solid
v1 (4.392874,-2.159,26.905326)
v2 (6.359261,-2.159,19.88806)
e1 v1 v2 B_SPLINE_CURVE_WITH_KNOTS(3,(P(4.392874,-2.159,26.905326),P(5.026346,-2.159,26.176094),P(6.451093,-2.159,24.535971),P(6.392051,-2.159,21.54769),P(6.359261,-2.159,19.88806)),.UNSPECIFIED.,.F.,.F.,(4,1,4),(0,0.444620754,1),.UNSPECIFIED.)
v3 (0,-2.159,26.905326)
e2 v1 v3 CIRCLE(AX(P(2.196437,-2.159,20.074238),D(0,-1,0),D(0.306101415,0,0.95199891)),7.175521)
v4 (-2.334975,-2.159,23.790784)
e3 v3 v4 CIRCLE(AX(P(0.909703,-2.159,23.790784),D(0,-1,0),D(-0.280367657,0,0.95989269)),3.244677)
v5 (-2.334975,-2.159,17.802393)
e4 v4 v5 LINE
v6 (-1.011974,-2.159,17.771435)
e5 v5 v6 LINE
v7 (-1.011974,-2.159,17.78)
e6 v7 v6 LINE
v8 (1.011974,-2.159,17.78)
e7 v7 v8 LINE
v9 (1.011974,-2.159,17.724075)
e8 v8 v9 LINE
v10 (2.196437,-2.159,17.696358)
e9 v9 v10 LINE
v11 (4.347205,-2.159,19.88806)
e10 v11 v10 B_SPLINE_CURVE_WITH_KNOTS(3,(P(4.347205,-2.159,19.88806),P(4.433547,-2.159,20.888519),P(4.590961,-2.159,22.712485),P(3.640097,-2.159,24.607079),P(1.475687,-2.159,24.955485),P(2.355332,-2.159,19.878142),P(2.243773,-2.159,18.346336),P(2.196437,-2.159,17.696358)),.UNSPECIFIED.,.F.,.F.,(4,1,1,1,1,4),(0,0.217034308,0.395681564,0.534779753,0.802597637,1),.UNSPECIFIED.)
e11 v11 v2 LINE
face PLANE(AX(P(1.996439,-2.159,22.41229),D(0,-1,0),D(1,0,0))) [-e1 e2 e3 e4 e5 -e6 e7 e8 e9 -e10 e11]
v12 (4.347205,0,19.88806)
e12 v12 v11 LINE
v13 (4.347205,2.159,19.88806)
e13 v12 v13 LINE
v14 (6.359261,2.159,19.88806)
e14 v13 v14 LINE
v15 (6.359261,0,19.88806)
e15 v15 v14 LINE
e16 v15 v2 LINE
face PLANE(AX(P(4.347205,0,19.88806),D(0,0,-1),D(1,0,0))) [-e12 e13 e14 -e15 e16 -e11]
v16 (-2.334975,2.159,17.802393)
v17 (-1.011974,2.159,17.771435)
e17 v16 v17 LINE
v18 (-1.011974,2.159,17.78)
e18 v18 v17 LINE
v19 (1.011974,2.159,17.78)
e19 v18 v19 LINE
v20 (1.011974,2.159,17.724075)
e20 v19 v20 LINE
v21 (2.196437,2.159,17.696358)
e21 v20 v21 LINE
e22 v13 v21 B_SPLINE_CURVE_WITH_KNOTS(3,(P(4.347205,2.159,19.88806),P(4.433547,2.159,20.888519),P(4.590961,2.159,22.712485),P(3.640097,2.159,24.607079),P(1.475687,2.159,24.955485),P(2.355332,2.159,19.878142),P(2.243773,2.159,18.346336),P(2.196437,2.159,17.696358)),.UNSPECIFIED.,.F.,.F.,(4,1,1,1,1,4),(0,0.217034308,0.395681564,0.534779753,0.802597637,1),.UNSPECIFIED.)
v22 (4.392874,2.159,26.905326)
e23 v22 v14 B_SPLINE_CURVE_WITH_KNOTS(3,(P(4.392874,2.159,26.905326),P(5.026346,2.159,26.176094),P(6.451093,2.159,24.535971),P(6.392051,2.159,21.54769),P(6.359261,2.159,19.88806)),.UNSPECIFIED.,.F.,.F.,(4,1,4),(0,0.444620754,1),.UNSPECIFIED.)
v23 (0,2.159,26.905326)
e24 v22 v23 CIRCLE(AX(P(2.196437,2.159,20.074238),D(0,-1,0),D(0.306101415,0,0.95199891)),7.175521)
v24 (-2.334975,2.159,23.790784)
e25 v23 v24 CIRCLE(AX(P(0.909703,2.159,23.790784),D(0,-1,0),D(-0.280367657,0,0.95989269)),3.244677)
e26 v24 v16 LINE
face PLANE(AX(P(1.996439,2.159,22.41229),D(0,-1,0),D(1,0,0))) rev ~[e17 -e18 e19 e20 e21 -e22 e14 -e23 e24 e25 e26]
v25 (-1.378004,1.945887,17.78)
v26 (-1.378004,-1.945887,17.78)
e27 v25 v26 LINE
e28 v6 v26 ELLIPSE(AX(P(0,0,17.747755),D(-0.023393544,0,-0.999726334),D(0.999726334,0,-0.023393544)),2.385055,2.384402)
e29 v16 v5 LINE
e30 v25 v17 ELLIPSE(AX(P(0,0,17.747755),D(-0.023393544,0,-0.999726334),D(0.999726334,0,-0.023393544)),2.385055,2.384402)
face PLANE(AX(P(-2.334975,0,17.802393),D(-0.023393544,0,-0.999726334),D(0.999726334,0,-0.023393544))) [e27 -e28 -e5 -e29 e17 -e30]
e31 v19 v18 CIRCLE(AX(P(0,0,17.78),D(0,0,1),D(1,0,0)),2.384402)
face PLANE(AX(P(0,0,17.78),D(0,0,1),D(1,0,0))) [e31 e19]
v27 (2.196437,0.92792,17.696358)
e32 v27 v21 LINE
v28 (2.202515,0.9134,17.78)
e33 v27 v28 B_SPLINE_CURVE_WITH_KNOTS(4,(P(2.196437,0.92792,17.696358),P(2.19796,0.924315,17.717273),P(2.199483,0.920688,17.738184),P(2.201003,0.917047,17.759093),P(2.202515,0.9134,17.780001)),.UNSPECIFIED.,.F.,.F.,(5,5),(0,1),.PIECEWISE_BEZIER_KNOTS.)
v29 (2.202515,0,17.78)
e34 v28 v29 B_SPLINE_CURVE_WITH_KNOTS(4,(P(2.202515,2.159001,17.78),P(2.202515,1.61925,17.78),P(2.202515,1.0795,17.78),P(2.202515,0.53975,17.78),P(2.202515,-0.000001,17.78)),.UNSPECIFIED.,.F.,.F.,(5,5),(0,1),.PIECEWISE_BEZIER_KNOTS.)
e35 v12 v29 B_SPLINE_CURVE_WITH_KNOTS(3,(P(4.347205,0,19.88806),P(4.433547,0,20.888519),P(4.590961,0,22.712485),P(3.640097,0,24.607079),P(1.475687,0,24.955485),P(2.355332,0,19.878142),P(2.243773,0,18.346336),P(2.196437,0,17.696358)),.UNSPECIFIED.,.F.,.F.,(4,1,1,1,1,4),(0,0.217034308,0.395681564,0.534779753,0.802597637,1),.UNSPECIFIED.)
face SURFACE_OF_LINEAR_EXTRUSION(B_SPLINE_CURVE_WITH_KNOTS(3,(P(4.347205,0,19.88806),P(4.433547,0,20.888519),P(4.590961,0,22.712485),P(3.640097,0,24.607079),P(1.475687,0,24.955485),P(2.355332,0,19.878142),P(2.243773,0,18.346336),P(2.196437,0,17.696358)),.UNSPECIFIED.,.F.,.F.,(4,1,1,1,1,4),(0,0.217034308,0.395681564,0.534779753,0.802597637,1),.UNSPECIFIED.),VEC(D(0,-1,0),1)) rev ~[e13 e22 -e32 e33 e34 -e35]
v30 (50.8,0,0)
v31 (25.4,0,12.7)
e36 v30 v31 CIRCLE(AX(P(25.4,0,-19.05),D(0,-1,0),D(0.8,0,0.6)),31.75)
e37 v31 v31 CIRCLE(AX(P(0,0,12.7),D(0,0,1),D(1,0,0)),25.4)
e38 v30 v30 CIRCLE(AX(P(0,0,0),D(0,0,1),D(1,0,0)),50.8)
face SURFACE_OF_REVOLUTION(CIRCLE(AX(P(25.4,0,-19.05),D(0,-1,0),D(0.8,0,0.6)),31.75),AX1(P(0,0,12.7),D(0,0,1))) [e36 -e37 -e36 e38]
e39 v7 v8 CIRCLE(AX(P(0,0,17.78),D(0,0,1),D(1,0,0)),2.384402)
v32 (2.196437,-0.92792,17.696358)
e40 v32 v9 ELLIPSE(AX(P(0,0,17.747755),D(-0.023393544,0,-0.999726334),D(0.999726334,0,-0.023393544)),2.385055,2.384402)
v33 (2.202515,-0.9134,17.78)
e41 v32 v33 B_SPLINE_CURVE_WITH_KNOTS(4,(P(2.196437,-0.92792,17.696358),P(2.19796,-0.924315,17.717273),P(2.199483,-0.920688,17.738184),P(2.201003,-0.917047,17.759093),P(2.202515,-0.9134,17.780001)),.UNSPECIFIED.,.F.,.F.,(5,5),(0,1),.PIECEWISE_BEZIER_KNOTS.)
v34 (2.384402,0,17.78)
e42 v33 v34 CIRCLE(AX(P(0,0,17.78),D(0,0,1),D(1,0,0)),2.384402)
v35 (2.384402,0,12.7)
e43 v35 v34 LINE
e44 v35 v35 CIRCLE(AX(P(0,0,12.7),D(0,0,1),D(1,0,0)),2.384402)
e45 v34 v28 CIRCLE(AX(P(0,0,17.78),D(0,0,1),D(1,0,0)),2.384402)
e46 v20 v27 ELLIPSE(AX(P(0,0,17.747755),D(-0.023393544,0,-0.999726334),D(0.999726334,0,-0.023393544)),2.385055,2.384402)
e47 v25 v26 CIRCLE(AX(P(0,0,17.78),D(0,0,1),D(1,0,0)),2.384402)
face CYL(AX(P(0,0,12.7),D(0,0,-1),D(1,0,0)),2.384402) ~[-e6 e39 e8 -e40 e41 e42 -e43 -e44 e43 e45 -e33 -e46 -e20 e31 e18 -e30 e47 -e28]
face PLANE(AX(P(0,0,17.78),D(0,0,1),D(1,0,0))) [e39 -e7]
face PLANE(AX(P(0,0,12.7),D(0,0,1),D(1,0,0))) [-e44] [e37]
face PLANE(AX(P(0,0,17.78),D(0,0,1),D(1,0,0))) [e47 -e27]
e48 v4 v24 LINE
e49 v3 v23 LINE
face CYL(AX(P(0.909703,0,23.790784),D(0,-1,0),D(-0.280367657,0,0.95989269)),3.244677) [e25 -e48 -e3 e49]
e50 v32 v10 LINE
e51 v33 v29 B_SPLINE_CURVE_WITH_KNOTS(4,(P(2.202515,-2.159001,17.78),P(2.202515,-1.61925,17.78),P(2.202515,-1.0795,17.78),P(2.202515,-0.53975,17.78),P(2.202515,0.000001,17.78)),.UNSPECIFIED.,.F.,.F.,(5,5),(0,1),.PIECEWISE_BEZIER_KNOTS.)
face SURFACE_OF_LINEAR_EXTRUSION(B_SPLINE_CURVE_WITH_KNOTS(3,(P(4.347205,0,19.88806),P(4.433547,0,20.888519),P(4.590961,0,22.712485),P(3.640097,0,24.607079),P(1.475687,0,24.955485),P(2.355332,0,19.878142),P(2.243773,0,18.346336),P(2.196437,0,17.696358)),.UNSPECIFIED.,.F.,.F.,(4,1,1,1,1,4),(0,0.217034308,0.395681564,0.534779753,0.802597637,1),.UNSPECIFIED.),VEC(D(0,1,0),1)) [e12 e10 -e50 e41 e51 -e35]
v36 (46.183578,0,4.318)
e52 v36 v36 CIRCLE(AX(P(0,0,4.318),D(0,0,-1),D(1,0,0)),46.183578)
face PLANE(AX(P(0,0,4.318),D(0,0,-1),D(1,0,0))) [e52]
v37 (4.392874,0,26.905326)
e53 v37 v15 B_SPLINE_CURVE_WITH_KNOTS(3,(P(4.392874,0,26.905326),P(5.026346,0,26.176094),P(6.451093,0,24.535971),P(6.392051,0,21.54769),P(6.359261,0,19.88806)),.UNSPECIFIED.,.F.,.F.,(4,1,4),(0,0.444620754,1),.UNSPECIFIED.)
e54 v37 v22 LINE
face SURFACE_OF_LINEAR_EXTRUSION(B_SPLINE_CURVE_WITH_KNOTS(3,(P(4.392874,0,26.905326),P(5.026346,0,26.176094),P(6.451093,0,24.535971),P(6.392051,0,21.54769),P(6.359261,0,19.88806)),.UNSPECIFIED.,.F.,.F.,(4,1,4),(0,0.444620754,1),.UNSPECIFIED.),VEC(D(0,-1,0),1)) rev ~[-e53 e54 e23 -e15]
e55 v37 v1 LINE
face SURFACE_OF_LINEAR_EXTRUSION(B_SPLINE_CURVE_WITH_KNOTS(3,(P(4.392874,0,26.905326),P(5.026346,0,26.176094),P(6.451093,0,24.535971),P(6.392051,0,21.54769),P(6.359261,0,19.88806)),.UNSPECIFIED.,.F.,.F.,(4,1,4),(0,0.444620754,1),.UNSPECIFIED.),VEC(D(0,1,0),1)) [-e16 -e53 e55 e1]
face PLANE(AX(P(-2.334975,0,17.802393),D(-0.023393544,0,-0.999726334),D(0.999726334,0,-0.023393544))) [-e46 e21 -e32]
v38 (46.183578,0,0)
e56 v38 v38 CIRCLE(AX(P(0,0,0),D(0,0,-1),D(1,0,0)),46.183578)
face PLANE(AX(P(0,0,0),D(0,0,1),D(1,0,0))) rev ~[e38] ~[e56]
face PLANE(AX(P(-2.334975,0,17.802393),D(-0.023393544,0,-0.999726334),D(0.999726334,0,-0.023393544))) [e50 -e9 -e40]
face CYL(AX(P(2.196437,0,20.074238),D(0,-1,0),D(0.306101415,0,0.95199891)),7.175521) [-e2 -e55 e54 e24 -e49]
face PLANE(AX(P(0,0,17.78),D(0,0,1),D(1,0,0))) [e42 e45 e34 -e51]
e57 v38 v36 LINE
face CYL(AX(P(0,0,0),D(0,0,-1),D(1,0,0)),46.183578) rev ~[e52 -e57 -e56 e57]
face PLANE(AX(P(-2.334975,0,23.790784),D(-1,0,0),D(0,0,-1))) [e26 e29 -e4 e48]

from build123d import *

# Parameters (mm, degrees)
F0_R     = 50.8
F1_DEPTH = 12.7
F4_R     = 2.3844019002
F5_DEPTH = 5.08
F7_DEPTH = 2.159
F8_R     = 46.183577677
F9_DEPTH = 4.318


# Not quite as in the source:
# - a fillet or chamfer that OpenCascade refuses, or shapes differently, is made with other operations: its cross-section is extruded or revolved along the edge and cut away or added


with BuildPart() as f1:
    # F0 (on Top) → F1 (new body)
    with BuildSketch(Plane.XY):
        Circle(F0_R)
    extrude(amount=F1_DEPTH)

    # F2: fillet of radius 31.75 on 1 edges, made by hand

    # F2_s1 → F2_t2 (revolve, cut)
    with BuildSketch(Plane.XZ):
        with BuildLine():
            ThreePointArc((50.8, 0), (39.5990316571, 9.3480633142), (25.4, 12.7))
            Line((25.4, 12.7), (50.8, 12.7))
            Line((50.8, 12.7), (50.8, 0))
        make_face()
    revolve(axis=Axis((0, 0, 12.7), (0, 0, 1)), mode=Mode.SUBTRACT)

    # F4 (on face) → F5 (join)
    with BuildSketch(Plane.XY.offset(12.7)):
        Circle(F4_R)
    extrude(amount=F5_DEPTH)

    # F6 (on Front) → F7 (join, symmetric)
    with BuildSketch(Plane.XZ):
        with BuildLine():
            Line((-2.3349747062, 23.7907841802), (-2.3349747062, 17.8023930639))
            Line((-2.3349747062, 17.8023930639), (2.1964372136, 17.6963582635))
            add(Edge.make_bspline(
                [(4.347205162, 19.8880601674), (4.4335474069, 20.8885193067), (4.5909606666, 22.7124852177), (3.6400970731, 24.6070794631), (1.4756871927, 24.9554852281), (2.3553322785, 19.8781417965), (2.2437732053, 18.3463361327), (2.1964372136, 17.6963582635)],
                knots=[0, 0, 0, 0, 0.2170343083, 0.395681564, 0.5347797532, 0.8025976366, 1, 1, 1, 1], degree=3))
            Line((4.347205162, 19.8880601674), (6.3592605293, 19.8880601674))
            add(Edge.make_bspline(
                [(4.3928744271, 26.9053261727), (5.0263463985, 26.1760936525), (6.4510931733, 24.5359710236), (6.3920513007, 21.5476896096), (6.3592605293, 19.8880601674)],
                knots=[0, 0, 0, 0, 0.4446207541, 1, 1, 1, 1], degree=3))
            ThreePointArc((4.3928744271, 26.9053261727), (2.1964372136, 27.2497590183), (0, 26.9053261727))
            ThreePointArc((0, 26.9053261727), (-1.6864120154, 25.7370934247), (-2.3349747062, 23.7907841802))
        make_face()
    extrude(amount=F7_DEPTH, both=True)

    # F8 (on face) → F9 (cut)
    with BuildSketch(Plane(origin=(0, 0, 0), x_dir=(1, 0, 0), z_dir=(0, 0, -1))):
        Circle(F8_R)
    extrude(amount=-F9_DEPTH, mode=Mode.SUBTRACT)


solid = f1.part
